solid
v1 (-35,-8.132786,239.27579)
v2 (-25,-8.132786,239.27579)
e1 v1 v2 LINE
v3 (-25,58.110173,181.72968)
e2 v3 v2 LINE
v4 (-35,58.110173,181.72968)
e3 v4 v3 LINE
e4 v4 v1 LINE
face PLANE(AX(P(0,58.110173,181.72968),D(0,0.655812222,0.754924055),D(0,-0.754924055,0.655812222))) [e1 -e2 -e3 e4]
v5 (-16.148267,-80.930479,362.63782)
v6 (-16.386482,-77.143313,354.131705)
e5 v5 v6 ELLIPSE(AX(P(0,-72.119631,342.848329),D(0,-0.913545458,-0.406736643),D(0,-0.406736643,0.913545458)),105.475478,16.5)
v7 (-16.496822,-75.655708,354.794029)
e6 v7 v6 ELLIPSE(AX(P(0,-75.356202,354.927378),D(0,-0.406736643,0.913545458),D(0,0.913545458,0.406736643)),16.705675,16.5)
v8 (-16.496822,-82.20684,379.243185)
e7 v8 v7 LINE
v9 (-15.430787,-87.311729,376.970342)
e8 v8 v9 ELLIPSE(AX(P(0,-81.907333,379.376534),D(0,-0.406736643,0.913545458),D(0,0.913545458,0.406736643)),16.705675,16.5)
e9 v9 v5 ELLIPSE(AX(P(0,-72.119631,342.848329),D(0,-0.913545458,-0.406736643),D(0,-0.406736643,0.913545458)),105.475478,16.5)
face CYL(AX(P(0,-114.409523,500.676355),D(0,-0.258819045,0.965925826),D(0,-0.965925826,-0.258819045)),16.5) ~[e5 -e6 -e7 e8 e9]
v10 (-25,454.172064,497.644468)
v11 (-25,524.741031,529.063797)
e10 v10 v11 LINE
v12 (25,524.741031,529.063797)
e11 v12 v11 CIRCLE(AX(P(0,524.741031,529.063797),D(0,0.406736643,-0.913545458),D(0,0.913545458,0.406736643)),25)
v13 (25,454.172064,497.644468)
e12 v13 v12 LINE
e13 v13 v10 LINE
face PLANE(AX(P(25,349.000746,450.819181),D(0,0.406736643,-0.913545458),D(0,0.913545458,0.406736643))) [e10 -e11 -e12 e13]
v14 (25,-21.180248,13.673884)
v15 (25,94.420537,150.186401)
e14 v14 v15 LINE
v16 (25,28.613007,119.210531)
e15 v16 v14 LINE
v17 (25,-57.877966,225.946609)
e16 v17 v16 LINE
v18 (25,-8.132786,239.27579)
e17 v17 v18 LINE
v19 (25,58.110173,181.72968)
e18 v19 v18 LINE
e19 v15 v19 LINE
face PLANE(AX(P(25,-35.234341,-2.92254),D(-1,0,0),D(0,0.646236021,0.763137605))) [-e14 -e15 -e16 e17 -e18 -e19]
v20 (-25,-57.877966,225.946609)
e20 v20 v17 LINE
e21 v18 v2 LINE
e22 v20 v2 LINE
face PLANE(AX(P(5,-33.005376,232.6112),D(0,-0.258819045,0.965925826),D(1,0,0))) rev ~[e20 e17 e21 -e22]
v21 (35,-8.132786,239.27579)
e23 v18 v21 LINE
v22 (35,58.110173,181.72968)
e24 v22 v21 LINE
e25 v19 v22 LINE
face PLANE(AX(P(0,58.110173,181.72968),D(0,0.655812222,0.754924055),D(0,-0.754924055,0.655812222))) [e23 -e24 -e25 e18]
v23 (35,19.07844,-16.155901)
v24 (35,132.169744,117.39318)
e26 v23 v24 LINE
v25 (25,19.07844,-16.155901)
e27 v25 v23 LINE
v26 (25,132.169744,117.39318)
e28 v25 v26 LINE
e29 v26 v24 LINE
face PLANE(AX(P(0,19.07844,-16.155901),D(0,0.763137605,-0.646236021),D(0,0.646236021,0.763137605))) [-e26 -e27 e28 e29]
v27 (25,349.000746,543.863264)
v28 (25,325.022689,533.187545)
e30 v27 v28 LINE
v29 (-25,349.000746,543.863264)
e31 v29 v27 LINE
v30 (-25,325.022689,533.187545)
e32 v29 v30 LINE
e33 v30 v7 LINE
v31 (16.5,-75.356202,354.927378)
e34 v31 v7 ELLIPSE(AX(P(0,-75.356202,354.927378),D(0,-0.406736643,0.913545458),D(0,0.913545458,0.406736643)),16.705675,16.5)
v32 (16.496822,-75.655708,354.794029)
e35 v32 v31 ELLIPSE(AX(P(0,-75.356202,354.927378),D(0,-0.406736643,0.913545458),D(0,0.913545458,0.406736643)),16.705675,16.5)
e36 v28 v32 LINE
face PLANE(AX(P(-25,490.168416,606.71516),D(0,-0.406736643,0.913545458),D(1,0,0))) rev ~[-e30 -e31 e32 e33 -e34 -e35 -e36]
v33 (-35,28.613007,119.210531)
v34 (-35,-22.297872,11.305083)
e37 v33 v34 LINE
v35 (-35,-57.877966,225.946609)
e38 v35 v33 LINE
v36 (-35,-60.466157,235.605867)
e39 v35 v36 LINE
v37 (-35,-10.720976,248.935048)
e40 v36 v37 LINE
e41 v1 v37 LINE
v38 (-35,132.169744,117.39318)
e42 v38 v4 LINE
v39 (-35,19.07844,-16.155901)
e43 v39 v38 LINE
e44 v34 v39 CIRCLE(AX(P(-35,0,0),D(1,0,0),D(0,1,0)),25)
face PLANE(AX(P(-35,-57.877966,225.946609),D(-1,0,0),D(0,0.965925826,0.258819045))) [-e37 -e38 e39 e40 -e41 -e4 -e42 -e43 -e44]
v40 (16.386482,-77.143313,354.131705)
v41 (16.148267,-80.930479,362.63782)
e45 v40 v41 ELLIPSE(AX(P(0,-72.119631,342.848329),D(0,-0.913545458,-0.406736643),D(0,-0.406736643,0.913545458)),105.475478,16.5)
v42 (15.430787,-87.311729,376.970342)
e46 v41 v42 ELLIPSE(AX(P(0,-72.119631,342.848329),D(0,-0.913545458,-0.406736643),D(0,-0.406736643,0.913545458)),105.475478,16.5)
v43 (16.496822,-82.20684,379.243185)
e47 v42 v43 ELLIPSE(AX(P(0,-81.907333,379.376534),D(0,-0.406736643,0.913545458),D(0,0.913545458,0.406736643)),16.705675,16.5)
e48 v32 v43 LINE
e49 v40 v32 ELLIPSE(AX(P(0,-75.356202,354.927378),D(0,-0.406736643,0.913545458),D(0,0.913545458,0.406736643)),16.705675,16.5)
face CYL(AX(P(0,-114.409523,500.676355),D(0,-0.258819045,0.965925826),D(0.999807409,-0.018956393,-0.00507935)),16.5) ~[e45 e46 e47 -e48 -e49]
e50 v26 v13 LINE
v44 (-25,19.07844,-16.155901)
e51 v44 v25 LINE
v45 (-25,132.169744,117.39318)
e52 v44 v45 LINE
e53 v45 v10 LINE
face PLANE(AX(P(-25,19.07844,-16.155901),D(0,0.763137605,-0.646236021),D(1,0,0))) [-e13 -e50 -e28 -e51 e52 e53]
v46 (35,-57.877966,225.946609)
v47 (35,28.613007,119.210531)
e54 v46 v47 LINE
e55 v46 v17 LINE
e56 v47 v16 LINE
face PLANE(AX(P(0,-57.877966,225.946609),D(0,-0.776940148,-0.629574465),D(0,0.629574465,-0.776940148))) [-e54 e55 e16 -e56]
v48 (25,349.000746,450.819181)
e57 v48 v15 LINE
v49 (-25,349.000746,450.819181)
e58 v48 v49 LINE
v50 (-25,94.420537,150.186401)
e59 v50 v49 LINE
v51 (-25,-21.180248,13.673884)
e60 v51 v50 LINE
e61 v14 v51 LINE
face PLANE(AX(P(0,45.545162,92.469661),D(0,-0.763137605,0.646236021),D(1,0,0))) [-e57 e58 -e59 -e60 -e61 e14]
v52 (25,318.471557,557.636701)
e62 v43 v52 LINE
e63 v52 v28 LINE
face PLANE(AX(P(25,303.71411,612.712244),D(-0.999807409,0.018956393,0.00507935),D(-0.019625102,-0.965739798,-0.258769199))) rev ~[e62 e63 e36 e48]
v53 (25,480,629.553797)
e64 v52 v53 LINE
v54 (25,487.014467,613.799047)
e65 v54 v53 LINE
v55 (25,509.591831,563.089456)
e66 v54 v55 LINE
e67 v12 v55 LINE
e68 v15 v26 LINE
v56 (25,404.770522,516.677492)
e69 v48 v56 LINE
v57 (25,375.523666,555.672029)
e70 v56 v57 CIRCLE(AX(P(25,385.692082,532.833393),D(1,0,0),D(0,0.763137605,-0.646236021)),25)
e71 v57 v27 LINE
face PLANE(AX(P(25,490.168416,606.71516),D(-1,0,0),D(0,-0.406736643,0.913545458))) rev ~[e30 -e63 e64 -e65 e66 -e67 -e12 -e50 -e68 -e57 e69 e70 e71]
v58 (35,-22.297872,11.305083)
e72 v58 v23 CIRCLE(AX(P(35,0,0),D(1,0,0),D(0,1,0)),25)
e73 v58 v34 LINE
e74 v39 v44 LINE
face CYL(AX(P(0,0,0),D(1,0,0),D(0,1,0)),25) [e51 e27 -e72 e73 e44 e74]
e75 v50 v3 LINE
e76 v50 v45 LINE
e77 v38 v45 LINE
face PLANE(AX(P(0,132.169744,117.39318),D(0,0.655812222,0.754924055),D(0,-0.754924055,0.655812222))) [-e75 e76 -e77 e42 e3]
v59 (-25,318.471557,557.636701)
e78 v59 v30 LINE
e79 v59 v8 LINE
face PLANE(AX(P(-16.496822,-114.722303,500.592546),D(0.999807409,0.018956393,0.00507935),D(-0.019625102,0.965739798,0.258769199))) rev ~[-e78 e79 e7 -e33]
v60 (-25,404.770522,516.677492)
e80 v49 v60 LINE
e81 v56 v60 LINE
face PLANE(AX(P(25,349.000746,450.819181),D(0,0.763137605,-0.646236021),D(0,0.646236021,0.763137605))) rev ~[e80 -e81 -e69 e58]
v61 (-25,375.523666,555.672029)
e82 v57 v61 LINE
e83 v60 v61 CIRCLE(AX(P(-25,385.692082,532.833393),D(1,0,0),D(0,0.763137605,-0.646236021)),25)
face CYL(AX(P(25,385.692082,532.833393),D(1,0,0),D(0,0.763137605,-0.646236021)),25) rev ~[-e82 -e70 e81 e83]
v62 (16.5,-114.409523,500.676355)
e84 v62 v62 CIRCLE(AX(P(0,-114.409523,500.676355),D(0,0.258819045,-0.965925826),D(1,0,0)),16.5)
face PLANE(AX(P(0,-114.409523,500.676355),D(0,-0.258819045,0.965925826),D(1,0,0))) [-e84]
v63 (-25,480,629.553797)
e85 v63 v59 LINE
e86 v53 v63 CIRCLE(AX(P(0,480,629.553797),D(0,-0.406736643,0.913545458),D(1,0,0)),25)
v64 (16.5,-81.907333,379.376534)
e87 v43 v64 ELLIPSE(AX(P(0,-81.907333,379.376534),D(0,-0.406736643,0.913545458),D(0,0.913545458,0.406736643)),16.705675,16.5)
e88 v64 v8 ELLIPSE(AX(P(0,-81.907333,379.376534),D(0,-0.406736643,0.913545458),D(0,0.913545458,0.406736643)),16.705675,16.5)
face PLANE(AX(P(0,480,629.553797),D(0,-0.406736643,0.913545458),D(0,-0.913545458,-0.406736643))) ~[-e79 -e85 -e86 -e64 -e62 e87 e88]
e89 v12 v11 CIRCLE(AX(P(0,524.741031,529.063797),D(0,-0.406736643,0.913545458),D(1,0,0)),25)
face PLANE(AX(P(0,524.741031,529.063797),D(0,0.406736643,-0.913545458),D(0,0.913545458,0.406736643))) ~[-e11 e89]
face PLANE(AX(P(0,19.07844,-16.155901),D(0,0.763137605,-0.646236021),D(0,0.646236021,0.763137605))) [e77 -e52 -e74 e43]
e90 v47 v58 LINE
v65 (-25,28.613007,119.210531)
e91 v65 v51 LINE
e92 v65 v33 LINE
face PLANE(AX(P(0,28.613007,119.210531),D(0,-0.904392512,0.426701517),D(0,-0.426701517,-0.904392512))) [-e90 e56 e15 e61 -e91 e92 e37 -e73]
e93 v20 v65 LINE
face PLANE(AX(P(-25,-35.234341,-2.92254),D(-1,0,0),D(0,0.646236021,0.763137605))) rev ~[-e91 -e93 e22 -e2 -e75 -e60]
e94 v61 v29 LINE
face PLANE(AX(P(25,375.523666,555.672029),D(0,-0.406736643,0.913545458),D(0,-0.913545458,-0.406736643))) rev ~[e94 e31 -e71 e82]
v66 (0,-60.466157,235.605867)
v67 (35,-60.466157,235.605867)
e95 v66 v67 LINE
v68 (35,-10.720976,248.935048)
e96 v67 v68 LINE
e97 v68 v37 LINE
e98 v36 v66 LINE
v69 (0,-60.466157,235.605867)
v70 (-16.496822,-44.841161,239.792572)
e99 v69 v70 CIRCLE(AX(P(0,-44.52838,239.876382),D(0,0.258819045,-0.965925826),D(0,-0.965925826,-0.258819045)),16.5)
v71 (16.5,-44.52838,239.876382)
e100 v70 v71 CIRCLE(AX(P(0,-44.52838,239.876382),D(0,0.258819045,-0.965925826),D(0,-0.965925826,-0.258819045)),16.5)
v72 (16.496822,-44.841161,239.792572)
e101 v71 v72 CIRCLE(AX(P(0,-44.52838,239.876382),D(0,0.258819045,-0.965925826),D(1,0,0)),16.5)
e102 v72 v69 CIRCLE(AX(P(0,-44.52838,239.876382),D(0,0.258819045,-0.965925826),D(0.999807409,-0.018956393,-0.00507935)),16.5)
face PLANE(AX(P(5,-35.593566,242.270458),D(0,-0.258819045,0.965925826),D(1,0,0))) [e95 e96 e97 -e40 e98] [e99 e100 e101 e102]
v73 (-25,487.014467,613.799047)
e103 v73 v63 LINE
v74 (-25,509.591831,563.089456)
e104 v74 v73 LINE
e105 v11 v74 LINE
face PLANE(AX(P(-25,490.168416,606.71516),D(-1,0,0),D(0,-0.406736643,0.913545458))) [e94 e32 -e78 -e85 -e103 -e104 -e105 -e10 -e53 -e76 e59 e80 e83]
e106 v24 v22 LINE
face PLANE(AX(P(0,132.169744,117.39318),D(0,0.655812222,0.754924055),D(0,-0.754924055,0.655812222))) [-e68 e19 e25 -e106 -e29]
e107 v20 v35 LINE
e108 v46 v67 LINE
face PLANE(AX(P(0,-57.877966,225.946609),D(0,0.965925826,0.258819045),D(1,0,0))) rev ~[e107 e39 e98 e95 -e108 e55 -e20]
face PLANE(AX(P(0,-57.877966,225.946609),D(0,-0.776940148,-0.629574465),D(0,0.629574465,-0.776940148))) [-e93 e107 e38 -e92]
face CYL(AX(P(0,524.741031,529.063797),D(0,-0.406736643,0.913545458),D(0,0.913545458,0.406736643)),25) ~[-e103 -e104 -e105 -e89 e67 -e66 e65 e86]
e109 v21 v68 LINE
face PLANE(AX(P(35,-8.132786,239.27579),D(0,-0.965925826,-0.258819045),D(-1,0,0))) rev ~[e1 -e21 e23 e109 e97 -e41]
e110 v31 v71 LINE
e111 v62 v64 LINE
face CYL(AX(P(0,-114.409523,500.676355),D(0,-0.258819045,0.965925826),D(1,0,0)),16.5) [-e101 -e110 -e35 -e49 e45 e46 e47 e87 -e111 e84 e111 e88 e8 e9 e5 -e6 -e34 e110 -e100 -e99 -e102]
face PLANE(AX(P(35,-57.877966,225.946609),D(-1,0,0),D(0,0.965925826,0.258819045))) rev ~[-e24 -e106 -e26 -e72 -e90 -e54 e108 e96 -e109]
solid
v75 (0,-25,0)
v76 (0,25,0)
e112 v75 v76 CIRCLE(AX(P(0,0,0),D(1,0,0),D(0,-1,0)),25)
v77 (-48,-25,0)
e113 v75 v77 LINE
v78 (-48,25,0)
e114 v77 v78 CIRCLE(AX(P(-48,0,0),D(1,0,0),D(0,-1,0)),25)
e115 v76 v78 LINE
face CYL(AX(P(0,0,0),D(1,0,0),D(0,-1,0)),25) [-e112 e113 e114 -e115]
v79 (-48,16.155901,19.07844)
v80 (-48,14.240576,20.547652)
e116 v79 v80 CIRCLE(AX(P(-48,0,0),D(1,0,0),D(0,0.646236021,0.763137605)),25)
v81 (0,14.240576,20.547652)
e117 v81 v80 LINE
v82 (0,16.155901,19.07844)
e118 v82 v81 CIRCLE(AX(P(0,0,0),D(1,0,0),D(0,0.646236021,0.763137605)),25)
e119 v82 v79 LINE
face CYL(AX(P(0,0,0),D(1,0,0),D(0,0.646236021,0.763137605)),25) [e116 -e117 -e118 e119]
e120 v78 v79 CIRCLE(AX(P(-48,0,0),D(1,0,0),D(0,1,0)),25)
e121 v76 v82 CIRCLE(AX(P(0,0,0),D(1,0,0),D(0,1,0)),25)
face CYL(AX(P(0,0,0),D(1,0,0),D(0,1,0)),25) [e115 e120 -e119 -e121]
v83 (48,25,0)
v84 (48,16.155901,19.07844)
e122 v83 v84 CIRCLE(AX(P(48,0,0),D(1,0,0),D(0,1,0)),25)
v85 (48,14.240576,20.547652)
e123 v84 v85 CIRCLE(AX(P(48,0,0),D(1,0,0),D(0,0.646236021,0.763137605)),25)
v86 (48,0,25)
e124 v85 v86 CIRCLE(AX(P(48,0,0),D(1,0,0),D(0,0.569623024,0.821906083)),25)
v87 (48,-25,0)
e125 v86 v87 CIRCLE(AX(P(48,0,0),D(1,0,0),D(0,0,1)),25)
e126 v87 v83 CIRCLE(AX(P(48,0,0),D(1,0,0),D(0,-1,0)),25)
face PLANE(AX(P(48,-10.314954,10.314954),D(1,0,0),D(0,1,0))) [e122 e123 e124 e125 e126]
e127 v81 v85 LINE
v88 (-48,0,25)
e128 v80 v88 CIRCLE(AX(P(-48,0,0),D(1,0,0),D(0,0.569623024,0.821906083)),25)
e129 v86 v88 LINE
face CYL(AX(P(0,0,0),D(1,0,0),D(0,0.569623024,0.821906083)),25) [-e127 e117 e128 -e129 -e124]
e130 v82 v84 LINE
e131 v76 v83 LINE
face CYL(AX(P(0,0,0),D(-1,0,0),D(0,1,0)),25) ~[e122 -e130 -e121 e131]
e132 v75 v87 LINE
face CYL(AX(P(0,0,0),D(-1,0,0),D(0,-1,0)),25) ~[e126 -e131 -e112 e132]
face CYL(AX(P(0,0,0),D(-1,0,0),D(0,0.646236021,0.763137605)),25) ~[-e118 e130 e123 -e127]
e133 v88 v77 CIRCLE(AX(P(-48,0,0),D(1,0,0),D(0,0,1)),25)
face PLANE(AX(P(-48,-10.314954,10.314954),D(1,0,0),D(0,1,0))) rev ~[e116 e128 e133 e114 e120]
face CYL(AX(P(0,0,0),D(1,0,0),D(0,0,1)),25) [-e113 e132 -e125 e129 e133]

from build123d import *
from build123d import SkipClean  # not in build123d's __all__

# Parameters (mm, degrees)
F5_DEPTH  = 48
F7_W      = 50
F7_H      = 50
F8_REACH  = 912.7734613462
F10_R     = 16.5
F11_DEPTH = 280
F4_W      = 50
F4_H      = 25
F12_DEPTH = 621
F14_DEPTH = 50
F16_DEPTH = 50
F19_DEPTH = 35
F20_W     = 50
F20_H     = 250
F21_REACH = 742.8364387972
F24_DEPTH = 142
F25_DEPTH = 270
F22_W     = 10
F22_H     = 51.5
F26_DEPTH = 10


# Not quite as in the source:
# - an extrude ends at something that could not be found from the text; its depth is read off the source's solid


with BuildPart() as f2:
    # F1 (on Right) → F2 (revolve)
    with BuildSketch(Plane.YZ):
        Polygon((502.8386364411, 639.7222130194), (480, 629.5537969425), (524.7410307383, 529.0637966018), (547.5796671794, 539.2322126787), align=None)
    revolve(axis=Axis((0, 502.3705153692, 579.3087967721), (0, 0.4067366431, -0.9135454576)))

    f8_end = f2.faces().sort_by_distance((0, 479.5318789281, 569.1403806952))[0]
    # F7 (on line) → F8 (join, up to a face of the model that its end follows)
    with BuildSketch(Plane(origin=(0, 0, 0), x_dir=(1, 0, 0), z_dir=(0, 0.6462360214, 0.7631376053))):
        Rectangle(F7_W, F7_H)
    f8_long = extrude(amount=F8_REACH, mode=Mode.PRIVATE)
    add(split(f8_long, bisect_by=f8_end, keep=Keep.ALL, mode=Mode.PRIVATE).solids().sort_by_distance((0, 0, 0))[0])



with BuildPart() as f5:
    # F0 (on Right) → F5 (new body, symmetric)
    with BuildSketch(Plane.YZ):
        with BuildLine():
            Line((0, 0), (0, 25))
            ThreePointArc((0, 25), (-17.6776695297, 17.6776695297), (-25, 0))
            Line((-25, 0), (0, 0))
        make_face()
        with BuildLine():
            Line((15, 17.7134416851), (14.2405756119, 20.5476520858))
            ThreePointArc((14.2405756119, 20.5476520858), (7.4601842422, 23.8609650072), (0, 25))
            Line((0, 25), (0, 0))
            Line((0, 0), (15, 17.7134416851))
        make_face()
        with BuildLine():
            ThreePointArc((16.1559005349, 19.078440133), (15.2159812854, 19.8361768878), (14.2405756119, 20.5476520858))
            Line((14.2405756119, 20.5476520858), (15, 17.7134416851))
            Line((15, 17.7134416851), (16.1559005349, 19.078440133))
        make_face()
        with BuildLine():
            Line((16.1559005349, 19.078440133), (15, 17.7134416851))
            Line((15, 17.7134416851), (0, 0))
            Line((0, 0), (25, 0))
            ThreePointArc((25, 0), (22.6814628427, 10.5143351342), (16.1559005349, 19.078440133))
        make_face()
        with BuildLine():
            Line((0, 0), (-25, 0))
            ThreePointArc((-25, 0), (0, -25), (25, 0))
            Line((25, 0), (0, 0))
        make_face()
    extrude(amount=F5_DEPTH, both=True)


with BuildPart() as f11:
    # F10 (on line) → F11 (new body)
    with BuildSketch(Plane(origin=(0, -132.8330735009, 495.739779231), x_dir=(1, 0, 0), z_dir=(0, -0.2588190451, 0.9659258263))):
        with Locations((0, 19.0734634568)):
            Circle(F10_R)
    extrude(amount=-F11_DEPTH)


with BuildPart() as f2_1:
    add(f2.part, clean=False)

    add(f11.part)  # F12 merges F11
    # F4 (on line) → F12 (join)
    with BuildSketch(Plane(origin=(0, 634.5161688048, 282.504799644), x_dir=(1, 0, 0), z_dir=(0, -0.9135454576, -0.4067366431))):
        with Locations((0, 367.3924228621)):
            Rectangle(F4_W, F4_H)
    extrude(amount=F12_DEPTH)

    # F13 (on face) → F14 (join, through all)
    with BuildSketch(Plane.YZ.offset(25)):
        Polygon((509.5918311512, 563.0894559697), (480, 629.5537969425), (349.0007462707, 571.2291714281), (349.0007462707, 450.8191807925), (454.1720638958, 497.6444682709), align=None)
        Polygon((524.7410307383, 529.0637966018), (509.5918311512, 563.0894559697), (454.1720638958, 497.6444682709), align=None)
    extrude(amount=-F14_DEPTH)

    # F15 (on face) → F16 (cut, through all)
    with BuildSketch(Plane.YZ.offset(25)):
        with BuildLine():
            Line((375.5236657091, 555.6720290176), (349.0007462707, 543.8632644655))
            Line((349.0007462707, 543.8632644655), (349.0007462707, 450.8191807925))
            Line((349.0007462707, 450.8191807925), (404.770521919, 516.6774920417))
            ThreePointArc((404.770521919, 516.6774920417), (405.6918470512, 547.8337055512), (375.5236657091, 555.6720290176))
        make_face()
    extrude(amount=-F16_DEPTH, mode=Mode.SUBTRACT)

    # F18 (on Right) → F19 (join, symmetric)
    with BuildSketch(Plane.YZ):
        with BuildLine():
            ThreePointArc((19.078440133, -16.1559005349), (23.4729738564, -8.6034585103), (25, 0))
            ThreePointArc((25, 0), (5.8117636963, 24.3150859085), (-22.2978722191, 11.3050826844))
            ThreePointArc((-22.2978722191, 11.3050826844), (-13.8245284036, -20.8298443206), (19.078440133, -16.1559005349))
        make_face()
        with BuildLine():
            ThreePointArc((-22.2978722191, 11.3050826844), (5.8117636963, 24.3150859085), (25, 0))
            ThreePointArc((25, 0), (23.4729738564, -8.6034585103), (19.078440133, -16.1559005349))
            Line((19.078440133, -16.1559005349), (132.169743877, 117.393180396))
            Line((132.169743877, 117.393180396), (58.1101733819, 181.729680453))
            Line((58.1101733819, 181.729680453), (28.6130073485, 119.2105305473))
            Line((28.6130073485, 119.2105305473), (-22.2978722191, 11.3050826844))
        make_face()
        Polygon((-57.8779660563, 225.9466092245), (28.6130073485, 119.2105305473), (58.1101733819, 181.729680453), (-8.1327860024, 239.2757900473), align=None)
    extrude(amount=F19_DEPTH, both=True)

    f21_end = Plane(origin=(0, -30.2261892372, 233.3558804925), x_dir=(0, 0.9659258263, 0.2588190451), z_dir=(0, -0.2588190451, 0.9659258263))
    # F20 (on face) → F21 (cut, up to a plane its end follows)
    with BuildSketch(Plane(origin=(0, -19.078440133, 16.1559005349), x_dir=(1, 0, 0), z_dir=(0, -0.7631376053, 0.6462360214))):
        with Locations((0, 100)):
            Rectangle(F20_W, F20_H)
    f21_long = extrude(amount=F21_REACH, mode=Mode.PRIVATE)
    add(split(f21_long, bisect_by=f21_end, keep=Keep.BOTTOM, mode=Mode.PRIVATE), mode=Mode.SUBTRACT)

    # F23 (on face) → F24 (cut)
    with BuildSketch(Plane(origin=(0, -132.8330735009, 495.739779231), x_dir=(1, 0, 0), z_dir=(0, -0.2588190451, 0.9659258263))):
        with BuildLine():
            ThreePointArc((0, 2.5734634568), (-11.5522090109, 7.2922722195), (-16.4968222509, 18.7496492786))
            Line((-16.4968222509, 18.7496492786), (-18.4926110681, 120.4257820466))
            Line((-18.4926110681, 120.4257820466), (-58.093066782, 121.2030947208))
            Line((-58.093066782, 121.2030947208), (-58.093066782, 2.5734634568))
            Line((-58.093066782, 2.5734634568), (0, 2.5734634568))
        make_face()
        Polygon((-58.093066782, 121.2030947208), (-18.4926110681, 120.4257820466), (-25, 451.9469005739), (-58.093066782, 452.5964804784), align=None)
        with BuildLine():
            Line((18.4783664089, 119.7000830905), (16.4968222509, 18.7496492786))
            ThreePointArc((16.4968222509, 18.7496492786), (11.5522090109, 7.2922722195), (0, 2.5734634568))
            Line((0, 2.5734634568), (64.5229642251, 2.5734634568))
            Line((64.5229642251, 2.5734634568), (64.5229642251, 118.796279111))
            Line((64.5229642251, 118.796279111), (18.4783664089, 119.7000830905))
        make_face()
        Polygon((25, 451.9469005739), (18.4783664089, 119.7000830905), (64.5229642251, 118.796279111), (64.5229642251, 451.171108971), align=None)
    with SkipClean():  # cleaning this boolean's faces spoils the solid; the shape is the same uncleaned
        extrude(amount=-F24_DEPTH, mode=Mode.SUBTRACT)

    # F23 (on face) → F25 (cut, through all)
    with BuildSketch(Plane(origin=(0, -132.8330735009, 495.739779231), x_dir=(1, 0, 0), z_dir=(0, -0.2588190451, 0.9659258263))):
        with BuildLine():
            Line((18.4783664089, 119.7000830905), (16.4968222509, 18.7496492786))
            ThreePointArc((16.4968222509, 18.7496492786), (11.5522090109, 7.2922722195), (0, 2.5734634568))
            Line((0, 2.5734634568), (64.5229642251, 2.5734634568))
            Line((64.5229642251, 2.5734634568), (64.5229642251, 118.796279111))
            Line((64.5229642251, 118.796279111), (18.4783664089, 119.7000830905))
        make_face()
        with BuildLine():
            ThreePointArc((0, 2.5734634568), (-11.5522090109, 7.2922722195), (-16.4968222509, 18.7496492786))
            Line((-16.4968222509, 18.7496492786), (-18.4926110681, 120.4257820466))
            Line((-18.4926110681, 120.4257820466), (-58.093066782, 121.2030947208))
            Line((-58.093066782, 121.2030947208), (-58.093066782, 2.5734634568))
            Line((-58.093066782, 2.5734634568), (0, 2.5734634568))
        make_face()
    extrude(amount=-F25_DEPTH, mode=Mode.SUBTRACT)

    # F22 (on face) → F26 (join)
    with BuildSketch(Plane(origin=(0, -60.3637408722, 225.28054787), x_dir=(1, 0, 0), z_dir=(0, -0.2588190451, 0.9659258263))):
        Polygon((-25, 54.0734634568), (-25, 2.5734634568), (0, 2.5734634568), (35, 2.5734634568), (35, 54.0734634568), align=None)
        with BuildLine():
            ThreePointArc((16.5, 19.0734634568), (11.6672618896, 7.4062015672), (0, 2.5734634568))
            ThreePointArc((0, 2.5734634568), (-11.6672618896, 30.7407253463), (16.5, 19.0734634568))
        make_face(mode=Mode.SUBTRACT)
        with Locations((-30, 28.3234634568)):
            Rectangle(F22_W, F22_H)
    extrude(amount=F26_DEPTH)


solid = Compound([f5.part, f2_1.part])
